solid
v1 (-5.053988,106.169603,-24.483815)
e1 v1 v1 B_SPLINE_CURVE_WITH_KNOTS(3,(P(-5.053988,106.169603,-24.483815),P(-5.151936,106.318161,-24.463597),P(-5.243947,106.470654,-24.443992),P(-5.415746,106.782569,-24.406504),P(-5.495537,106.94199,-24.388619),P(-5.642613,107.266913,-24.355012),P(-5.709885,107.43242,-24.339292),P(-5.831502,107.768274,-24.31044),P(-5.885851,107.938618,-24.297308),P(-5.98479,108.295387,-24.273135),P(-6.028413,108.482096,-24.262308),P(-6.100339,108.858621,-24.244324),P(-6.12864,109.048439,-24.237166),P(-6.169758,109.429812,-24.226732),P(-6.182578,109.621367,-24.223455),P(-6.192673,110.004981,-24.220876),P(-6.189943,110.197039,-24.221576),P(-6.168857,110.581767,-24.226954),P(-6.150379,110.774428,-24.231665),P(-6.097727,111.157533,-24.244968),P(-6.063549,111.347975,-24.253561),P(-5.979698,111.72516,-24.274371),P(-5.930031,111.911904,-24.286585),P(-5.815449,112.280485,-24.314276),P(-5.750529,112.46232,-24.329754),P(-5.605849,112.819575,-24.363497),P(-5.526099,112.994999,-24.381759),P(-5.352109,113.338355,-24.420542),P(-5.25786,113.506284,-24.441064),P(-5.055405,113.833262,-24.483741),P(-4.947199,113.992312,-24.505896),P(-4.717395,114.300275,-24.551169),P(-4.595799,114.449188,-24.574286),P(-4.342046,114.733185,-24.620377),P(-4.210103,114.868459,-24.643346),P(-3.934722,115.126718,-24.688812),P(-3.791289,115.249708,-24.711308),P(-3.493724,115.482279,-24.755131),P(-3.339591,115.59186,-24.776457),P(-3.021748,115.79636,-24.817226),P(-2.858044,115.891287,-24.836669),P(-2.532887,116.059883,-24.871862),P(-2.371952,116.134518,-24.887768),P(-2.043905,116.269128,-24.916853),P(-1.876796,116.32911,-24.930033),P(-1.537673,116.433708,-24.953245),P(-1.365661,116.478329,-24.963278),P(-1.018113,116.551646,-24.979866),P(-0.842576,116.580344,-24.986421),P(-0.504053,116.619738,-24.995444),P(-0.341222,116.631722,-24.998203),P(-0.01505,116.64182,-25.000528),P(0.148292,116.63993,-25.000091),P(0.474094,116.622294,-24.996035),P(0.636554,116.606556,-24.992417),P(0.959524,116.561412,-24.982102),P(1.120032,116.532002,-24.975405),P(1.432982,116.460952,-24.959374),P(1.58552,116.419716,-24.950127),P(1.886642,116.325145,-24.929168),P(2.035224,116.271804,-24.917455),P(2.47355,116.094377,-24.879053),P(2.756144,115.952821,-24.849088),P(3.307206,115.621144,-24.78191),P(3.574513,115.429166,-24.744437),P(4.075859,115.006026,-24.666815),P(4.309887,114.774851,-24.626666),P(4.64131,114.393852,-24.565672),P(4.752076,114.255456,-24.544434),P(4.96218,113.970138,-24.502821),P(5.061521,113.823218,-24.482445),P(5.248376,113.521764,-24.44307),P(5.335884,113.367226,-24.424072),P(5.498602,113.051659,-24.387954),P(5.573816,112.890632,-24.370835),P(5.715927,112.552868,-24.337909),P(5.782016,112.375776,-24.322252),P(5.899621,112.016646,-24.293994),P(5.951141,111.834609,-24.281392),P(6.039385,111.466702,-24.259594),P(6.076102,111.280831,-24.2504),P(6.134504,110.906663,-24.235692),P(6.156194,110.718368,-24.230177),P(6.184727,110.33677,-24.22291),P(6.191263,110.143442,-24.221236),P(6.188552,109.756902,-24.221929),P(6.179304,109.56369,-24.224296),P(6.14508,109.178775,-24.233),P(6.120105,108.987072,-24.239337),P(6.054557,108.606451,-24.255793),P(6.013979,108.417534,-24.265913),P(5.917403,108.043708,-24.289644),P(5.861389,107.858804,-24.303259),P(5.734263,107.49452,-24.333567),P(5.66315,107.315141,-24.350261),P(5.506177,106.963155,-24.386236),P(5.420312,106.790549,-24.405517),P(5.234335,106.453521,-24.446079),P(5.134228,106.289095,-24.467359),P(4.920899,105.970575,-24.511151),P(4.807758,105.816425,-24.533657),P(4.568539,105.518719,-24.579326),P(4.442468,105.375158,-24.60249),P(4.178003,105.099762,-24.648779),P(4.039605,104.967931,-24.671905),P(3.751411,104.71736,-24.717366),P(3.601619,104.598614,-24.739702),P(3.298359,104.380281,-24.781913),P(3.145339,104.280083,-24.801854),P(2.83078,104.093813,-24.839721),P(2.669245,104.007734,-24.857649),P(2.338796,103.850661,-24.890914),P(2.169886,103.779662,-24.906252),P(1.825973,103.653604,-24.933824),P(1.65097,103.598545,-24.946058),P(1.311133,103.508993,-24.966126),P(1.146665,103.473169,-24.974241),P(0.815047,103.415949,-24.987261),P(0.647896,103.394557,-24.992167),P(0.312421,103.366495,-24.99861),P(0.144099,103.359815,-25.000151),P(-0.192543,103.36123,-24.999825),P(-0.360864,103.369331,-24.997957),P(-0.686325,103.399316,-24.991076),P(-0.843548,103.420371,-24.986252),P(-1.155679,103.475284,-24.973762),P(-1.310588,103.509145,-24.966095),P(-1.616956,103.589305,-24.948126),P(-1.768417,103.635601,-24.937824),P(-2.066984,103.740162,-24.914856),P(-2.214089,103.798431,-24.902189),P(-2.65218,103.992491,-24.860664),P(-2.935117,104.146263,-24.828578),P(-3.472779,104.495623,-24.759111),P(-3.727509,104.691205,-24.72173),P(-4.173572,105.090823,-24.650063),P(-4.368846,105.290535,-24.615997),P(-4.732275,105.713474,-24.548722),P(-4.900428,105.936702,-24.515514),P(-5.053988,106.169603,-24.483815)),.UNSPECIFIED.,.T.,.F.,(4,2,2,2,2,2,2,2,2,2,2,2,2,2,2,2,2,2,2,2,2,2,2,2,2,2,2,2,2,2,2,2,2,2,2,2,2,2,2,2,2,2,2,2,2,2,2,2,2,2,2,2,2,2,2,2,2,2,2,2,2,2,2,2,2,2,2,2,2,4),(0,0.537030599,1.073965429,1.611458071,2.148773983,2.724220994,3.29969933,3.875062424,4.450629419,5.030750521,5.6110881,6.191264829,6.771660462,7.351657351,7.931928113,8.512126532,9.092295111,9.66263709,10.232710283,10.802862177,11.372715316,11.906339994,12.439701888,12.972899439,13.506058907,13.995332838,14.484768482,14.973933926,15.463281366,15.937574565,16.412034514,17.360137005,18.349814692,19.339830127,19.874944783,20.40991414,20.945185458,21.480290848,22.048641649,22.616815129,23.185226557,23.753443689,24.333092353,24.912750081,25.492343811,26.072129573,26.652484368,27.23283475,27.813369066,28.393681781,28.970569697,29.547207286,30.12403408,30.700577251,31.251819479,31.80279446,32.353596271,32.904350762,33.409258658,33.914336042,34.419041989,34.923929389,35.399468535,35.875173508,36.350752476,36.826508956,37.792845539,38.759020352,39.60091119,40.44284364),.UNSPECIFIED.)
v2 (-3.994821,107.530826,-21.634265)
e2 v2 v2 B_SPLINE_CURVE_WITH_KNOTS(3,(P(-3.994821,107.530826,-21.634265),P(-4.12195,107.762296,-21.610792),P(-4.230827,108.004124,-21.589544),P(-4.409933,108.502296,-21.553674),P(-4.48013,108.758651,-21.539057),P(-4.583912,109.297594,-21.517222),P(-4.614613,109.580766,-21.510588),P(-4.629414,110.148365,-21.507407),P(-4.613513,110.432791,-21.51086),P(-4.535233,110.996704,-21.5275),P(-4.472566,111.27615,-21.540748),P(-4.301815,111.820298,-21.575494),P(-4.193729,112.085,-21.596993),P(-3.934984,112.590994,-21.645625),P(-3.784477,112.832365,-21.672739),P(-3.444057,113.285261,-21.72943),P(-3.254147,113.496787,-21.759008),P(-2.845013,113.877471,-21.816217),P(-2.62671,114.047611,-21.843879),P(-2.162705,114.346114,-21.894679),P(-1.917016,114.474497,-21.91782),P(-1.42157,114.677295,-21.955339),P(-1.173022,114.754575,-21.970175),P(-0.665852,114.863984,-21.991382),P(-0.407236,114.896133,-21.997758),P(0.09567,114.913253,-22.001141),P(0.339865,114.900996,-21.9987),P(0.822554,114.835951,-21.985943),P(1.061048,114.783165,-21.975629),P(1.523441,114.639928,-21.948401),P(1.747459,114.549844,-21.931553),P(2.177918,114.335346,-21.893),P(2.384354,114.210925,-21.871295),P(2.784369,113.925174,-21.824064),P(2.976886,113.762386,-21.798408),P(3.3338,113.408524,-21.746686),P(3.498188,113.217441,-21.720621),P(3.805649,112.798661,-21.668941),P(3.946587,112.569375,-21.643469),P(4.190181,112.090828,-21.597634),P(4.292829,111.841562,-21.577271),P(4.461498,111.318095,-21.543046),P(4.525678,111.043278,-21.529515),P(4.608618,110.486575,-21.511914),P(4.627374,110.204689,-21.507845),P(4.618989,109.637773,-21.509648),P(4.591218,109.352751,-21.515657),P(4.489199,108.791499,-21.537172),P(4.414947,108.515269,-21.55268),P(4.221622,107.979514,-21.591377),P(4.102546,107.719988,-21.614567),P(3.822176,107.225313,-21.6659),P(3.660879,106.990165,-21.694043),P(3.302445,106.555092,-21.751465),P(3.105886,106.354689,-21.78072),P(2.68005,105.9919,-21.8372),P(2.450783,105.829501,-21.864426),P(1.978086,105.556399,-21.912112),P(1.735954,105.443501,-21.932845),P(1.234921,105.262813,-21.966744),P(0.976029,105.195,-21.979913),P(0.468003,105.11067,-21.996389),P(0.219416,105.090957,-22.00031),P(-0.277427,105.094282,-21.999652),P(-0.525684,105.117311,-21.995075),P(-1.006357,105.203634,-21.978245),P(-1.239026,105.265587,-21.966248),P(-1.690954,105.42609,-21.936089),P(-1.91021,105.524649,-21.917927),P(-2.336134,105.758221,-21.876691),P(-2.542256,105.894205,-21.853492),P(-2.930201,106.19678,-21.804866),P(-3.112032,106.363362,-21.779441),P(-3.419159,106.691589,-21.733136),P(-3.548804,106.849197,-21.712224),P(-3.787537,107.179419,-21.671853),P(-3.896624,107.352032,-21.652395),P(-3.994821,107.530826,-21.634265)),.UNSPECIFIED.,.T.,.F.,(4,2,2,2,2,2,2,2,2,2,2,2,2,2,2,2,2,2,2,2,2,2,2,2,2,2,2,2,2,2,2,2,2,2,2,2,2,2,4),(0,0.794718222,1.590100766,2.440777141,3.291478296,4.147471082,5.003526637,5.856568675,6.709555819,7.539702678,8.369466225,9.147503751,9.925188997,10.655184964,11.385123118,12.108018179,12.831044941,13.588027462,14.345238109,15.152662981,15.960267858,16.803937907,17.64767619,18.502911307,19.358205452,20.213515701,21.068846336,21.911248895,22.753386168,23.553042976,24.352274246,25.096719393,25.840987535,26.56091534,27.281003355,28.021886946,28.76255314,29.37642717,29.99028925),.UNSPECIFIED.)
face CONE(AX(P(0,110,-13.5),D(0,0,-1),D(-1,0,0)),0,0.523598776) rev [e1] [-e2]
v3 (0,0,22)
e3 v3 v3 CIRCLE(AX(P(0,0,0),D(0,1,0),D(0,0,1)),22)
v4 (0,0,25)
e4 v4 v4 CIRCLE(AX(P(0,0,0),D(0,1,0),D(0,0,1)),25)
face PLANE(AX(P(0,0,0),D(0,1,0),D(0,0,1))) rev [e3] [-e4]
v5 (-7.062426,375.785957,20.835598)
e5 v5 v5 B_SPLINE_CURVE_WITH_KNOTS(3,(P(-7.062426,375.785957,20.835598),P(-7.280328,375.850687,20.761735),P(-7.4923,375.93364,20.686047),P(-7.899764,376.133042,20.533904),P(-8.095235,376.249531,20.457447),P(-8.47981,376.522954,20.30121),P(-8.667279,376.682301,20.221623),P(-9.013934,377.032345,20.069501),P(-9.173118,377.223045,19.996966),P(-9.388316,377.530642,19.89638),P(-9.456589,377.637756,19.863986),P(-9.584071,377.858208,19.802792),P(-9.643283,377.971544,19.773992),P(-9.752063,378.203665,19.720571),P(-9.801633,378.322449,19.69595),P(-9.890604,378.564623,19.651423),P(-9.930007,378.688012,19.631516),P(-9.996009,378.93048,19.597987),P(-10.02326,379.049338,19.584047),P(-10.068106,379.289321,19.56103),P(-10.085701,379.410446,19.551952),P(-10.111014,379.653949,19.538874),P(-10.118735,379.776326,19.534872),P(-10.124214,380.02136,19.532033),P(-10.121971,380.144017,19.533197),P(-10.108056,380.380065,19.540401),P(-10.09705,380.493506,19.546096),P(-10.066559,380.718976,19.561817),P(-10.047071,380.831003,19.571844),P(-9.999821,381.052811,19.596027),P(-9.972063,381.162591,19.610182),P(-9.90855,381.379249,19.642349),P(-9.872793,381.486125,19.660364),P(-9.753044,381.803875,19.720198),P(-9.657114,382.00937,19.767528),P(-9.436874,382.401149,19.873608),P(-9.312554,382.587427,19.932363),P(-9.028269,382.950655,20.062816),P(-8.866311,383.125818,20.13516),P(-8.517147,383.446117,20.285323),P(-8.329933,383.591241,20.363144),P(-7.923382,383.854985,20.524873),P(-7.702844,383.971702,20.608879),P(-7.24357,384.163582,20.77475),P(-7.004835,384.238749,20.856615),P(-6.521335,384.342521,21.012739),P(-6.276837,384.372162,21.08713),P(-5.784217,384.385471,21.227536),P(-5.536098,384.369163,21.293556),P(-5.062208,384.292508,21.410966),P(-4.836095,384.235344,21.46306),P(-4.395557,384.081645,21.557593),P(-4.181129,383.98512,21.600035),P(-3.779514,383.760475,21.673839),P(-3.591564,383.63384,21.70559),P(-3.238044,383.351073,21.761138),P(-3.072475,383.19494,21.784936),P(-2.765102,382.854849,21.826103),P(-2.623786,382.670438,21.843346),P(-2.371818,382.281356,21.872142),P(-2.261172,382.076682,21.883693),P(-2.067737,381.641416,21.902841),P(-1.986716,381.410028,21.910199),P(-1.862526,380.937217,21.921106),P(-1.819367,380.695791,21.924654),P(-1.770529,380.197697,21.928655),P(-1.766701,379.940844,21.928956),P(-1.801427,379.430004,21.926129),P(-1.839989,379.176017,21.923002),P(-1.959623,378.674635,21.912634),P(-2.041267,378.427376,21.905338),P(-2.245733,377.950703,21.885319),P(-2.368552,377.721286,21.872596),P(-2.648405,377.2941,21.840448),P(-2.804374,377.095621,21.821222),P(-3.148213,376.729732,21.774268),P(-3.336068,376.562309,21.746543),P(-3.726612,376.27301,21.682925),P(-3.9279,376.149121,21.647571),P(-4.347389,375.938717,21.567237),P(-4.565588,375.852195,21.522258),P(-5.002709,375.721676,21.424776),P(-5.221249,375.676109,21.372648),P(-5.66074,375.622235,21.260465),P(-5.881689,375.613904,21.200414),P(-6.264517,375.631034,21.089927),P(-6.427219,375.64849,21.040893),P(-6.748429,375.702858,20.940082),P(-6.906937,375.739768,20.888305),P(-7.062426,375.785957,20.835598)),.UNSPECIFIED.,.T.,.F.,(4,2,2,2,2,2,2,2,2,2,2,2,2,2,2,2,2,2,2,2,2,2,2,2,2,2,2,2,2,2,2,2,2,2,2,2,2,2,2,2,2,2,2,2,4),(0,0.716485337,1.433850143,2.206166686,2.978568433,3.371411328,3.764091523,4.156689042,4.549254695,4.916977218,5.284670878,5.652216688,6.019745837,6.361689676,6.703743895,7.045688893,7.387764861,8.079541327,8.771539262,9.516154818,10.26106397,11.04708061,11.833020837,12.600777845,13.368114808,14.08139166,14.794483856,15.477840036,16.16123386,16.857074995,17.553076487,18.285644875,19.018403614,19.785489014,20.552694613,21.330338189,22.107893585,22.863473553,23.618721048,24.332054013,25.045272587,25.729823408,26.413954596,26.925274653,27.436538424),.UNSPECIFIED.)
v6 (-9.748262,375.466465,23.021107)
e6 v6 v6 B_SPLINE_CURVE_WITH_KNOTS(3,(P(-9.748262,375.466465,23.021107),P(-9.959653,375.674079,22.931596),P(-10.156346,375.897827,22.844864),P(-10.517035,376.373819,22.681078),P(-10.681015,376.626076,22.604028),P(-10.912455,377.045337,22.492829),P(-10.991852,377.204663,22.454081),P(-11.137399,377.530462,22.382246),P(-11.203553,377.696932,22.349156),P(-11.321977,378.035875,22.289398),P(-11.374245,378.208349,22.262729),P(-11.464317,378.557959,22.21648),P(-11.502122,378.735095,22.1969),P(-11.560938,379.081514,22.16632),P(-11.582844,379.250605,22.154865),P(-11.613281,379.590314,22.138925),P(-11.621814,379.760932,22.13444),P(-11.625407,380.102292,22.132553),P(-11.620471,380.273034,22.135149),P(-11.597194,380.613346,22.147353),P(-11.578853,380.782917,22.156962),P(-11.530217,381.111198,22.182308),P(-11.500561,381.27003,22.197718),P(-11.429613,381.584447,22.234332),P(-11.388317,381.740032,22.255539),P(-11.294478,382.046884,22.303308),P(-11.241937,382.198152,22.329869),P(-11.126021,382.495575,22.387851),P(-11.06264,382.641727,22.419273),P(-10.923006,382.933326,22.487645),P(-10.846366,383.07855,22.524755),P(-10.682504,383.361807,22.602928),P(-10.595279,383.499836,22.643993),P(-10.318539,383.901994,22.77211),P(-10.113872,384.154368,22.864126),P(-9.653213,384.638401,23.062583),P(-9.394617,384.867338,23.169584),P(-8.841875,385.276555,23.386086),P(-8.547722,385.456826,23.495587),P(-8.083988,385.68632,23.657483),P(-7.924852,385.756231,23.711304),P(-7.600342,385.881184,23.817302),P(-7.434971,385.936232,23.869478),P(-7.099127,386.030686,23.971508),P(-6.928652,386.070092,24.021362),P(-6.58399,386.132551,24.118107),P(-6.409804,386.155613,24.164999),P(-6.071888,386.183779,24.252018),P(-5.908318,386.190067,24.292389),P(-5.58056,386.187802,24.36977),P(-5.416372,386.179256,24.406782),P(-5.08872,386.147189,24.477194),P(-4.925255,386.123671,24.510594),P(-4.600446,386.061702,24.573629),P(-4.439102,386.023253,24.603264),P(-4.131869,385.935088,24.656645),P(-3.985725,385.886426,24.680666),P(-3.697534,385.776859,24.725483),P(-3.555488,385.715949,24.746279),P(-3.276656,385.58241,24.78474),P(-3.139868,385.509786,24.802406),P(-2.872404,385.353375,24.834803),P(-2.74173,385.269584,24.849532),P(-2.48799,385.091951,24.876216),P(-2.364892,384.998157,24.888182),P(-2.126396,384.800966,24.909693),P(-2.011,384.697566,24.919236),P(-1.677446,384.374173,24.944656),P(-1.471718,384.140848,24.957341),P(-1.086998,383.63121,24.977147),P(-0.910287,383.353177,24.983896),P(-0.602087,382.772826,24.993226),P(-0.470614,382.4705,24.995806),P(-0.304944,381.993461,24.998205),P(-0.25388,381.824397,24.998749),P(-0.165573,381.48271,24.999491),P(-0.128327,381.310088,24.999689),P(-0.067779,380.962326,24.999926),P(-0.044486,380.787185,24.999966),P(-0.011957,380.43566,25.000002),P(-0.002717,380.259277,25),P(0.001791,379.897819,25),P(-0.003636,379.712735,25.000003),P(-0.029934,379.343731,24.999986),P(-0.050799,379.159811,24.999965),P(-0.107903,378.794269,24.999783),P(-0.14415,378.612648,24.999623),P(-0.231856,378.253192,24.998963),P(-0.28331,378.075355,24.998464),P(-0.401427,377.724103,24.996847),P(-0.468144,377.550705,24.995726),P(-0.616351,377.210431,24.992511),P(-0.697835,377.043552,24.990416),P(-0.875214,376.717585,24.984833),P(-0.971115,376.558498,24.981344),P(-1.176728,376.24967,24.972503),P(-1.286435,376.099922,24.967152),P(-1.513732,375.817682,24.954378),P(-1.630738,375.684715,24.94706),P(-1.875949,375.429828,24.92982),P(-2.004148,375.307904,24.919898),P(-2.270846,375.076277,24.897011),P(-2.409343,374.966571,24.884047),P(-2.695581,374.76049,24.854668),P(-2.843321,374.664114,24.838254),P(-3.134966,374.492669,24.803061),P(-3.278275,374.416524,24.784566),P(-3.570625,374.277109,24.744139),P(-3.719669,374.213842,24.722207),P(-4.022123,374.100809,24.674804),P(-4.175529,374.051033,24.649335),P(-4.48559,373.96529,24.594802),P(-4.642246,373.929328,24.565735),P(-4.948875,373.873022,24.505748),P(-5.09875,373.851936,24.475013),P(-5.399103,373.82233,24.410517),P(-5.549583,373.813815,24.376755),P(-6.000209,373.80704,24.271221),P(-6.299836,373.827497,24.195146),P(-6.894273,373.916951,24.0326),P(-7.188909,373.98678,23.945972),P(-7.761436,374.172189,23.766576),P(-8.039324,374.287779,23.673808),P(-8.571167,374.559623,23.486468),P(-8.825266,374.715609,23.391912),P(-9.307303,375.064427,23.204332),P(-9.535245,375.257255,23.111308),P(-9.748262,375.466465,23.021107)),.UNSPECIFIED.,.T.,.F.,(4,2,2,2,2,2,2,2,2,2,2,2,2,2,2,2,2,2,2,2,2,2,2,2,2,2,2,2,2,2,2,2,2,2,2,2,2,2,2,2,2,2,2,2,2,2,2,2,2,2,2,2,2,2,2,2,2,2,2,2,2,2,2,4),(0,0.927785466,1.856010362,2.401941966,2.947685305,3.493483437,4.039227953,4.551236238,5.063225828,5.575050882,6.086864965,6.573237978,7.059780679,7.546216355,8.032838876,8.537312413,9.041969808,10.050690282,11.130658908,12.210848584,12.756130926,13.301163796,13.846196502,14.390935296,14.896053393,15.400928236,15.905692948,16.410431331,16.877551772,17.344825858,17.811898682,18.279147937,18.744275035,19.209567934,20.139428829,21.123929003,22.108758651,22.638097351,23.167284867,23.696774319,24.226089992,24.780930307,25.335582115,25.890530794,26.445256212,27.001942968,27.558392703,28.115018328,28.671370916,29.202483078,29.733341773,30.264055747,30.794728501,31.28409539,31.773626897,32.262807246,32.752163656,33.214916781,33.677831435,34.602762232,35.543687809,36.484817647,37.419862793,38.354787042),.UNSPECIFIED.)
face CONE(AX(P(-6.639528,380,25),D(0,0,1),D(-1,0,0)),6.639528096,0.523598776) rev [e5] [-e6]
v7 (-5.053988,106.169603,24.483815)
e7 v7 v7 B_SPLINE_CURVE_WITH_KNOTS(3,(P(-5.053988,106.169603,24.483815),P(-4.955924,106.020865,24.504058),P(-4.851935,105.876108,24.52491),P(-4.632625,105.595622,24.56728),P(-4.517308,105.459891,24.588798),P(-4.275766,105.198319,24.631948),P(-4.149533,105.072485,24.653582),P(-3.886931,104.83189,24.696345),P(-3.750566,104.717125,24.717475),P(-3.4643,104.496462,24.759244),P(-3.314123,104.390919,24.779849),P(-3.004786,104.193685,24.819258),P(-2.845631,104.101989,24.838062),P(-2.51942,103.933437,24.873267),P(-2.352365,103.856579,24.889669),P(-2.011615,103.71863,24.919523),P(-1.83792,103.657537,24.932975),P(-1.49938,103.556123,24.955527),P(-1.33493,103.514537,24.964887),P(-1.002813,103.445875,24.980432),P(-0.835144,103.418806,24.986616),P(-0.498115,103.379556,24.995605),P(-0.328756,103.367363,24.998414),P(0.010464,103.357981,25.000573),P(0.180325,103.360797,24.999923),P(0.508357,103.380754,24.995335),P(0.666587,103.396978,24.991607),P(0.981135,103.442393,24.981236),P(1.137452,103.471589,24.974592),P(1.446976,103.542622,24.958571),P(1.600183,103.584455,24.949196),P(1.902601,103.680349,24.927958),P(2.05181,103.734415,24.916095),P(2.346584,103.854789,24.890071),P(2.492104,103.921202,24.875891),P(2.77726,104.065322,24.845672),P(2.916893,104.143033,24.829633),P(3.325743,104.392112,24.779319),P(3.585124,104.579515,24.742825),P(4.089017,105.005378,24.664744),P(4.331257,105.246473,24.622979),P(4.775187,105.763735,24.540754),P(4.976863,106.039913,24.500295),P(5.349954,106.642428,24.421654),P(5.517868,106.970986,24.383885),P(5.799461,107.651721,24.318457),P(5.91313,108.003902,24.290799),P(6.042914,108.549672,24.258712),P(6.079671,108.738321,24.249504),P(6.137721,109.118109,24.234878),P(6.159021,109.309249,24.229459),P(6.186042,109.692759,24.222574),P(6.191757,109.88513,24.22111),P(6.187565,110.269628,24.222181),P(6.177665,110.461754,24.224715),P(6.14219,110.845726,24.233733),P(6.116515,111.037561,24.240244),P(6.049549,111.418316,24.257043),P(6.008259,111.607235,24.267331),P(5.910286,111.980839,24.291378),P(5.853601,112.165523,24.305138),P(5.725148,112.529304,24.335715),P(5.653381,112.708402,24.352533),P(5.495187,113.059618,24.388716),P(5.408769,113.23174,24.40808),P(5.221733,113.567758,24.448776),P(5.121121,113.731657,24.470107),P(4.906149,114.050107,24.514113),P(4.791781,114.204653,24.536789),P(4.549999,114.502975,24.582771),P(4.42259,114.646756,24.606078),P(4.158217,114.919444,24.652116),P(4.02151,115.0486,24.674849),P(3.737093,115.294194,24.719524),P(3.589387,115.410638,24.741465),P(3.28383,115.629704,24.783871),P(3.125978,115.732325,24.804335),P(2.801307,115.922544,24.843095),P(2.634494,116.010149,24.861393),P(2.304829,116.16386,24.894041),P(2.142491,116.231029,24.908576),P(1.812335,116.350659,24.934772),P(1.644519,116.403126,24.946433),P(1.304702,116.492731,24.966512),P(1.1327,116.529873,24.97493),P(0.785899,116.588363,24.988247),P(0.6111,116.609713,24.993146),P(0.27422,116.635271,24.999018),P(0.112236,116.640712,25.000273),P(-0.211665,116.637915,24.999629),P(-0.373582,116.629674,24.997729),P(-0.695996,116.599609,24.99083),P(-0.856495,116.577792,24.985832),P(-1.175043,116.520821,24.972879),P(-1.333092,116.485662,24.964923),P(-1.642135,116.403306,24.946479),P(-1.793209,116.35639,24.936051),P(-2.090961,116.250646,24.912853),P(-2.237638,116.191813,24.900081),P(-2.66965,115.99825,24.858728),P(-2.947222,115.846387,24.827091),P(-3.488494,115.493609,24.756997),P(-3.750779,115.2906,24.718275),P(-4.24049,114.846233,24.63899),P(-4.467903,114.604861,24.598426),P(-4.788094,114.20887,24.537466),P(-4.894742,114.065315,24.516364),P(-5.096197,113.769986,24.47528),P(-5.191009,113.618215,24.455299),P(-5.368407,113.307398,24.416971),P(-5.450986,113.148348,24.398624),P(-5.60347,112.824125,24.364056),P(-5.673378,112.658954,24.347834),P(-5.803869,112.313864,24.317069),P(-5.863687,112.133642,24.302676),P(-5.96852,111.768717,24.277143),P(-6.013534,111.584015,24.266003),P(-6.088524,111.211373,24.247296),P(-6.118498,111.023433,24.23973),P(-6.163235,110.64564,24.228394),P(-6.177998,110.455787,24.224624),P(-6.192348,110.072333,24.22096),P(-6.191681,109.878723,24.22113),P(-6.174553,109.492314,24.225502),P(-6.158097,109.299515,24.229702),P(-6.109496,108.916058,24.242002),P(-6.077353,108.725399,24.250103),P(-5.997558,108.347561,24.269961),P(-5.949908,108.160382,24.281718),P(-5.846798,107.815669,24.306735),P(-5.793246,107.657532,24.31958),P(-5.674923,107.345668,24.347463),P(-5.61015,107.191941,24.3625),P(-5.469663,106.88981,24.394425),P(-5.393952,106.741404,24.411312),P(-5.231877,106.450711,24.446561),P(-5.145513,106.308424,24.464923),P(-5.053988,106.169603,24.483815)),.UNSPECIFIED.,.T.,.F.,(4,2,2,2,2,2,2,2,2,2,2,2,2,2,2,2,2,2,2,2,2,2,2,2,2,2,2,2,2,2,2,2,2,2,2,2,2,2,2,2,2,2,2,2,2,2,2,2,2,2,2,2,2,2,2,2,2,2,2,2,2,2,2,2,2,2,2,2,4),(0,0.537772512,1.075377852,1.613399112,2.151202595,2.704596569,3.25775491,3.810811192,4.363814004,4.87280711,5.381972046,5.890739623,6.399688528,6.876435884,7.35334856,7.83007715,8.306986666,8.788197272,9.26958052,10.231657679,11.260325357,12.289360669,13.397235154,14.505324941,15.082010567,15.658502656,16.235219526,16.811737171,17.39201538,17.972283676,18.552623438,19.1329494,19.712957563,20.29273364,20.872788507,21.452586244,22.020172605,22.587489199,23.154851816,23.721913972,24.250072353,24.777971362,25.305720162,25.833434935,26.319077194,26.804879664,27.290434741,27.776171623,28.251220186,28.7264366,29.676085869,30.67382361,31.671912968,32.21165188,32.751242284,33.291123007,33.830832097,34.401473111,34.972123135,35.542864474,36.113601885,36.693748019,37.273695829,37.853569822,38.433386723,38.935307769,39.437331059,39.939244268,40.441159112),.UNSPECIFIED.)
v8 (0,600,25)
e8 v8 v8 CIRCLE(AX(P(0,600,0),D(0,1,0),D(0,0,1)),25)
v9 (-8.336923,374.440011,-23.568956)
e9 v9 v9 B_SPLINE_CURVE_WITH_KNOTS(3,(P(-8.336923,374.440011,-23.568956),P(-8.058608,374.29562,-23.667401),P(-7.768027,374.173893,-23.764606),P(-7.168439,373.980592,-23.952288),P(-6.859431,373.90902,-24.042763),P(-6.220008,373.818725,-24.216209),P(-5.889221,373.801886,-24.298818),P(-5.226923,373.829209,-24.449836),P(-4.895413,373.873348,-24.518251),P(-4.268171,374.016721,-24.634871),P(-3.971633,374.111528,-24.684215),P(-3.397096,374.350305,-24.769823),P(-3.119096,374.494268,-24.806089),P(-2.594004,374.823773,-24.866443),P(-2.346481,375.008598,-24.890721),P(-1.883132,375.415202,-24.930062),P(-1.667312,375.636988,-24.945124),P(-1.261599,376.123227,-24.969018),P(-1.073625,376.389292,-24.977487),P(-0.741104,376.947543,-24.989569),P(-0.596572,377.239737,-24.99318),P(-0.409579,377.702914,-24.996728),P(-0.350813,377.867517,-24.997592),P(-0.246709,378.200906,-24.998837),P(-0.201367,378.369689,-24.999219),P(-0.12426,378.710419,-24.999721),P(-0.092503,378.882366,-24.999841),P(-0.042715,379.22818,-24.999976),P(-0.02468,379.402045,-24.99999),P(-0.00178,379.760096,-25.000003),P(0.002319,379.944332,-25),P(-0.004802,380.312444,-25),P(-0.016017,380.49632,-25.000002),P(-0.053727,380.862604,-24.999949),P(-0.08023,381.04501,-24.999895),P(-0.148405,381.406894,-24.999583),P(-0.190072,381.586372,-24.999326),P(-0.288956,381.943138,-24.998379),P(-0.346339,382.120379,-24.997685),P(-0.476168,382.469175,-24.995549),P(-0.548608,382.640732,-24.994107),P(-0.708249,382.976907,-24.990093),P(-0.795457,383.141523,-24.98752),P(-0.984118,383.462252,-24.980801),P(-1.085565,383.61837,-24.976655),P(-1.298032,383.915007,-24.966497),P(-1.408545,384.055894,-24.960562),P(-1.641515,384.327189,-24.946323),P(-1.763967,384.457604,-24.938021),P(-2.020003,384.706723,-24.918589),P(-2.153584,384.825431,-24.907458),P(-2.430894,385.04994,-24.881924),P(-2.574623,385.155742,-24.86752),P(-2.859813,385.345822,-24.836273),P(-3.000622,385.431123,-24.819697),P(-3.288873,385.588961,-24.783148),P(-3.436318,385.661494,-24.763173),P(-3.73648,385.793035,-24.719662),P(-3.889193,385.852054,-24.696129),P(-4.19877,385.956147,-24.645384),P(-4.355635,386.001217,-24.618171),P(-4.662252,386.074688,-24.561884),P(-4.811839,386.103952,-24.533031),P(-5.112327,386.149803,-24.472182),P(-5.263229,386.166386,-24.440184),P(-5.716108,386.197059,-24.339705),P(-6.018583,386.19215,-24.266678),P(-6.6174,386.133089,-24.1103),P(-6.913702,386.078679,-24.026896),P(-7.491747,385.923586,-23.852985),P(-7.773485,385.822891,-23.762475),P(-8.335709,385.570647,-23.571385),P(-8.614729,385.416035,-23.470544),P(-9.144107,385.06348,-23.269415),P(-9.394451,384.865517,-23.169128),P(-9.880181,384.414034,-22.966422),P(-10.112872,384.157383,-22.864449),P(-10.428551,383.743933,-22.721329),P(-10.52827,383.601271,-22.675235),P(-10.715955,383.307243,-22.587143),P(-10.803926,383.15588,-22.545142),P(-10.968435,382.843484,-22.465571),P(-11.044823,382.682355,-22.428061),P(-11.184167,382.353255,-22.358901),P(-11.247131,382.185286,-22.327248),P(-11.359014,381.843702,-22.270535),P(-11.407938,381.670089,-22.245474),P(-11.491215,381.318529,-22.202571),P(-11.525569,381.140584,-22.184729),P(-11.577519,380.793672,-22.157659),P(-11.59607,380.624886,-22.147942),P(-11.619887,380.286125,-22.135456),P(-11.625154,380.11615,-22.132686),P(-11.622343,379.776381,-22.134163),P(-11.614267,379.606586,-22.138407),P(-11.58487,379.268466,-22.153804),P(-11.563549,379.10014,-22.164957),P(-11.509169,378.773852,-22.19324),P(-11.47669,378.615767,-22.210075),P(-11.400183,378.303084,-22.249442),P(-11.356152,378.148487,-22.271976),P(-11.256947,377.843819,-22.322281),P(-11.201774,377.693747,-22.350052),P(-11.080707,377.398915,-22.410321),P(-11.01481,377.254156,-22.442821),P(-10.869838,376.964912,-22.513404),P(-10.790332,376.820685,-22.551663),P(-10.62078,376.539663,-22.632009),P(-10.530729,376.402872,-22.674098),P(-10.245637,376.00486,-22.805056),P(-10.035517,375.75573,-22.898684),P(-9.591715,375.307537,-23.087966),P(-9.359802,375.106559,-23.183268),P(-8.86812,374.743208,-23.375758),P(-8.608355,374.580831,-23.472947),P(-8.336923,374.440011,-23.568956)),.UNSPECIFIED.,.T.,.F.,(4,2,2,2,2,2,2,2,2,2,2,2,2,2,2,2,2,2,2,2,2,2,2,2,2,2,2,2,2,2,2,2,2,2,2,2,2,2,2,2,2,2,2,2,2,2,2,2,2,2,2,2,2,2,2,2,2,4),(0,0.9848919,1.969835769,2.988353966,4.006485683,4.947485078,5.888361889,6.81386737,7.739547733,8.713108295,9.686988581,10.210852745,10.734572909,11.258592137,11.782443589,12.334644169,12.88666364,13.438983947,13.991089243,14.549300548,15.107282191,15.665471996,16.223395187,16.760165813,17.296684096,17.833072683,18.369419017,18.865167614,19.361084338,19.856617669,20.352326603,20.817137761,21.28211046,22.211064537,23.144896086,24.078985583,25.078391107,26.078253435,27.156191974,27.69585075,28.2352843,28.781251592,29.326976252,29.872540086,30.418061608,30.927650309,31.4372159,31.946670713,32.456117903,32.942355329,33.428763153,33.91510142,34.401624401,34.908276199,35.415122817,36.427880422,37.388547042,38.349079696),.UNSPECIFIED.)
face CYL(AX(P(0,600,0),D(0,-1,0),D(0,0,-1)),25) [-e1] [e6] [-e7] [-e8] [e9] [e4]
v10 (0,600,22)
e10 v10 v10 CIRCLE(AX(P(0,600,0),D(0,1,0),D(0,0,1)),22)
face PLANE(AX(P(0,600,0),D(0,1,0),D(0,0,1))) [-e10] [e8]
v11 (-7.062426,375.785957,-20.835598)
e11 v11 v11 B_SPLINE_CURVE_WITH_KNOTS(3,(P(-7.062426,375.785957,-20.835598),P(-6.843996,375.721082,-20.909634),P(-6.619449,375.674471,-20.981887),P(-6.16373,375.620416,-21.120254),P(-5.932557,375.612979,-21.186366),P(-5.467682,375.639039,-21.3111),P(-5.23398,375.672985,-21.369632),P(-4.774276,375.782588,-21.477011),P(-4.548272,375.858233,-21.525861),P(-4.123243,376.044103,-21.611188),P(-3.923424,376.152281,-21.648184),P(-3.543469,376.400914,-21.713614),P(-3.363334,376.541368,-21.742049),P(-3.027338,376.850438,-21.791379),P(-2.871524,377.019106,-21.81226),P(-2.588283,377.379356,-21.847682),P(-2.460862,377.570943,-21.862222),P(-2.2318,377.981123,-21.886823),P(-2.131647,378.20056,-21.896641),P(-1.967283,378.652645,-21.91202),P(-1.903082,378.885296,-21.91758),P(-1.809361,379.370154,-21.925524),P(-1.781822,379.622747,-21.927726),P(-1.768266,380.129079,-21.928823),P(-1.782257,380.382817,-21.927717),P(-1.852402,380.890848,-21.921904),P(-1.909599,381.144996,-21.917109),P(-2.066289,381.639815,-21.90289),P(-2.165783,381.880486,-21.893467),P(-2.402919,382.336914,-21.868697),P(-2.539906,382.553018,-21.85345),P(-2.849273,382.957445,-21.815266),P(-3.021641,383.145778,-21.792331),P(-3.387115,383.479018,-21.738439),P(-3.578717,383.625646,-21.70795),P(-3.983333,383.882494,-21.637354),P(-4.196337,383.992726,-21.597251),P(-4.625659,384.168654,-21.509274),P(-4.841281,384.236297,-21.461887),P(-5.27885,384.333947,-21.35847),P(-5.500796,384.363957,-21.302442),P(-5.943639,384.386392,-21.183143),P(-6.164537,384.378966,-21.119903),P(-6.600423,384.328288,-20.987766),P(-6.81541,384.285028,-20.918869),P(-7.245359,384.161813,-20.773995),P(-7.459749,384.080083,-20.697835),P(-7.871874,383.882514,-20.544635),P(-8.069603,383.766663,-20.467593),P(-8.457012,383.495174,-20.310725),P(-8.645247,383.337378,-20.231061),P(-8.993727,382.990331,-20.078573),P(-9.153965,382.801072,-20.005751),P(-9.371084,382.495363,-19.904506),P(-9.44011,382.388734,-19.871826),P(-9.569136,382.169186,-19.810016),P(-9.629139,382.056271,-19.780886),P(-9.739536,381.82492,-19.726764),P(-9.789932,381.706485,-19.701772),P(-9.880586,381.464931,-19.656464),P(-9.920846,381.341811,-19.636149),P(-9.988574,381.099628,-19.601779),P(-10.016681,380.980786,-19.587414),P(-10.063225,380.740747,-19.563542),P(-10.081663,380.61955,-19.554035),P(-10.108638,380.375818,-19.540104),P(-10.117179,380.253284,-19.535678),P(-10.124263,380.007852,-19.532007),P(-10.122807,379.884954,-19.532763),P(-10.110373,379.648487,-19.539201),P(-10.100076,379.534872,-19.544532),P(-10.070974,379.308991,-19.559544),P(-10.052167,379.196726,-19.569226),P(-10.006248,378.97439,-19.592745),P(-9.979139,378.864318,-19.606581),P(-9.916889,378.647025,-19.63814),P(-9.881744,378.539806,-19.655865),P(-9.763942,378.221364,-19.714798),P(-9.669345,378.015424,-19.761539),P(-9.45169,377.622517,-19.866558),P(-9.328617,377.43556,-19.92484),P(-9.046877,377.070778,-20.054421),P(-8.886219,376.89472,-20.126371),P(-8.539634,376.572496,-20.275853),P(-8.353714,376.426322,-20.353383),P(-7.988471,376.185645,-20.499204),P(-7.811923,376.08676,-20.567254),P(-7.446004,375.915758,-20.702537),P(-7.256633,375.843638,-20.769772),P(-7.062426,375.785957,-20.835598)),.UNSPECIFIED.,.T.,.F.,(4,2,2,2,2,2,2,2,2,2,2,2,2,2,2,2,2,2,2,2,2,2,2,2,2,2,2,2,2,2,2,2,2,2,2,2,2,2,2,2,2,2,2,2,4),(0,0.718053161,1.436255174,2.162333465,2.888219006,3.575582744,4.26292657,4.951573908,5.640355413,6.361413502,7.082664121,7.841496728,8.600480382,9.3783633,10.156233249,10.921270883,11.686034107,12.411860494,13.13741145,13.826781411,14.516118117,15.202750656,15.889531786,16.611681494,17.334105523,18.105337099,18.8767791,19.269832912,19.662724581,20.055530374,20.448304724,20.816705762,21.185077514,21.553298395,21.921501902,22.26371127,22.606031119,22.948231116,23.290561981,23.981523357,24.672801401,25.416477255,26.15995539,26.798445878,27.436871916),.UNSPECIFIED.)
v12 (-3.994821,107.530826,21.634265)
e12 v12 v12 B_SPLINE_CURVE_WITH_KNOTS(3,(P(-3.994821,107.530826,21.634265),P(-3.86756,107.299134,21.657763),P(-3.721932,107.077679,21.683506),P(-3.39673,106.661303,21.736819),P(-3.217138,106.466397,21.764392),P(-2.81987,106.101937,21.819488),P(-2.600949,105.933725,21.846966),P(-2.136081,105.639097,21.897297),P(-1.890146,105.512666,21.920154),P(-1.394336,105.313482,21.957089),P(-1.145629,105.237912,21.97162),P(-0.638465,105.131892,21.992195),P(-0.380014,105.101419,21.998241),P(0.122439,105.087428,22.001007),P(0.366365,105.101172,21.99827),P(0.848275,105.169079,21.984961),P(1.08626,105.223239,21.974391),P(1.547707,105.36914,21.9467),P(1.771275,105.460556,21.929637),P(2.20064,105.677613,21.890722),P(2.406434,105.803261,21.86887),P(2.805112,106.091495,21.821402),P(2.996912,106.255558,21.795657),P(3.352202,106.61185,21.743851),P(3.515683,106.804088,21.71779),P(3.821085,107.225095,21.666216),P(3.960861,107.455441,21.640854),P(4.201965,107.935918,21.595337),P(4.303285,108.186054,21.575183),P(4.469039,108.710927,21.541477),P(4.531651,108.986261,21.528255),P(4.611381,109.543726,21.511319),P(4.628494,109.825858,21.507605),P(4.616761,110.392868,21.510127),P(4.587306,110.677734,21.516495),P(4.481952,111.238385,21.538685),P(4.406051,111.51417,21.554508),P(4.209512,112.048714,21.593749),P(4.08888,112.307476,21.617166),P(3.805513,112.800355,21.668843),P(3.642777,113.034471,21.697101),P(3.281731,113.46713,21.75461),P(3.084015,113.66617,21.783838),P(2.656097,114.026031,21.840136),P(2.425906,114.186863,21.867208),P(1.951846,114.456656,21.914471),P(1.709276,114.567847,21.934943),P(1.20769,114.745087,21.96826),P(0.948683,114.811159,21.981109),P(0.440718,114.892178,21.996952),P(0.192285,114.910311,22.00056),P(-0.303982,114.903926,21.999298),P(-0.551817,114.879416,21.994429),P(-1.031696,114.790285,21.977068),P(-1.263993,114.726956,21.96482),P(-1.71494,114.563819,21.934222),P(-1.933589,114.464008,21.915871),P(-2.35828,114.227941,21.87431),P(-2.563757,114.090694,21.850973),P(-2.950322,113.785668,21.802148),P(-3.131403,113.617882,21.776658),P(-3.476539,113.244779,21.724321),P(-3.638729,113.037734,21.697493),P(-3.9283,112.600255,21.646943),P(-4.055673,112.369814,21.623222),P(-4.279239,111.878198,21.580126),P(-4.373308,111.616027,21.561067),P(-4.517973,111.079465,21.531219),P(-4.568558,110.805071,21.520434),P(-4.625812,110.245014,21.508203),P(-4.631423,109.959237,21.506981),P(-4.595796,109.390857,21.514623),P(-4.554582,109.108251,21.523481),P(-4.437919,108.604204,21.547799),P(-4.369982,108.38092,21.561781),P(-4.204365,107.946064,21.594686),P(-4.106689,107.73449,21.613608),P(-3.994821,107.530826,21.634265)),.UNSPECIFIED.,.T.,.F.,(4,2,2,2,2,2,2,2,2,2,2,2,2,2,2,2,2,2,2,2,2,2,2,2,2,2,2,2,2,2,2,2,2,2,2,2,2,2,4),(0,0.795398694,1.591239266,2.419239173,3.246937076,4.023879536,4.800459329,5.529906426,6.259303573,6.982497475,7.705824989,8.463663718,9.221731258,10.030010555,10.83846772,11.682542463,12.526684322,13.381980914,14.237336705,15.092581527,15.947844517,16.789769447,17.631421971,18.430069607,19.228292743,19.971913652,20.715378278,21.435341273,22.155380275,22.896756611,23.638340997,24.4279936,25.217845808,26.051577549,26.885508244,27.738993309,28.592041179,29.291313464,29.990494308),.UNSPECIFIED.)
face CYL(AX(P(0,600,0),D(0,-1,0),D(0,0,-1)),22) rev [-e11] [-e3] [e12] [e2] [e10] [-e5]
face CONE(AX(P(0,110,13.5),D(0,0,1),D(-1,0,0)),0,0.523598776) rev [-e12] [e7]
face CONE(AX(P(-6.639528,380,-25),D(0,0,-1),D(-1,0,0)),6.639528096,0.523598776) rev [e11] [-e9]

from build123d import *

# Parameters (mm, degrees)
SKETCH1_R           = 25
SKETCH1_R_2         = 22
BOSS_EXTRUDE1_DEPTH = 600


with BuildPart() as part:
    # Sketch1 → Boss-Extrude1 (new body)
    with BuildSketch(Plane(origin=(0, 0, 0), x_dir=(1, 0, 0), z_dir=(0, 1, 0))):
        Circle(SKETCH1_R)
        Circle(SKETCH1_R_2, mode=Mode.SUBTRACT)
    extrude(amount=BOSS_EXTRUDE1_DEPTH)

    # Sketch4 → Cut-Revolve3 (revolve, cut)
    with BuildSketch(Plane(origin=(-103.136389545, 380, -329.994936254), x_dir=(-1, 0, 0), z_dir=(0, -1, 0))):
        Polygon((-96.496861449, -304.994936254), (-96.496861449, -316.494936254), (-103.136389545, -304.994936254), align=None)
    cut_revolve3 = revolve(axis=Axis((-6.639528096, 380, -25), (0, 0, 1)), mode=Mode.SUBTRACT)

    # Sketch5 → Cut-Revolve4 (revolve, cut)
    with BuildSketch(Plane(origin=(-103.136389545, 110, -329.994936254), x_dir=(-1, 0, 0), z_dir=(0, -1, 0))):
        Polygon((-103.136389545, -304.994936254), (-103.136389545, -316.494936254), (-96.496861449, -304.994936254), align=None)
    cut_revolve4 = revolve(axis=Axis((0, 110, -25), (0, 0, 1)), mode=Mode.SUBTRACT)

    # Mirror3: Cut-Revolve3, Cut-Revolve4 across plane
    add(cut_revolve3.mirror(Plane.XY), mode=Mode.SUBTRACT)
    add(cut_revolve4.mirror(Plane.XY), mode=Mode.SUBTRACT)


solid = part.part
